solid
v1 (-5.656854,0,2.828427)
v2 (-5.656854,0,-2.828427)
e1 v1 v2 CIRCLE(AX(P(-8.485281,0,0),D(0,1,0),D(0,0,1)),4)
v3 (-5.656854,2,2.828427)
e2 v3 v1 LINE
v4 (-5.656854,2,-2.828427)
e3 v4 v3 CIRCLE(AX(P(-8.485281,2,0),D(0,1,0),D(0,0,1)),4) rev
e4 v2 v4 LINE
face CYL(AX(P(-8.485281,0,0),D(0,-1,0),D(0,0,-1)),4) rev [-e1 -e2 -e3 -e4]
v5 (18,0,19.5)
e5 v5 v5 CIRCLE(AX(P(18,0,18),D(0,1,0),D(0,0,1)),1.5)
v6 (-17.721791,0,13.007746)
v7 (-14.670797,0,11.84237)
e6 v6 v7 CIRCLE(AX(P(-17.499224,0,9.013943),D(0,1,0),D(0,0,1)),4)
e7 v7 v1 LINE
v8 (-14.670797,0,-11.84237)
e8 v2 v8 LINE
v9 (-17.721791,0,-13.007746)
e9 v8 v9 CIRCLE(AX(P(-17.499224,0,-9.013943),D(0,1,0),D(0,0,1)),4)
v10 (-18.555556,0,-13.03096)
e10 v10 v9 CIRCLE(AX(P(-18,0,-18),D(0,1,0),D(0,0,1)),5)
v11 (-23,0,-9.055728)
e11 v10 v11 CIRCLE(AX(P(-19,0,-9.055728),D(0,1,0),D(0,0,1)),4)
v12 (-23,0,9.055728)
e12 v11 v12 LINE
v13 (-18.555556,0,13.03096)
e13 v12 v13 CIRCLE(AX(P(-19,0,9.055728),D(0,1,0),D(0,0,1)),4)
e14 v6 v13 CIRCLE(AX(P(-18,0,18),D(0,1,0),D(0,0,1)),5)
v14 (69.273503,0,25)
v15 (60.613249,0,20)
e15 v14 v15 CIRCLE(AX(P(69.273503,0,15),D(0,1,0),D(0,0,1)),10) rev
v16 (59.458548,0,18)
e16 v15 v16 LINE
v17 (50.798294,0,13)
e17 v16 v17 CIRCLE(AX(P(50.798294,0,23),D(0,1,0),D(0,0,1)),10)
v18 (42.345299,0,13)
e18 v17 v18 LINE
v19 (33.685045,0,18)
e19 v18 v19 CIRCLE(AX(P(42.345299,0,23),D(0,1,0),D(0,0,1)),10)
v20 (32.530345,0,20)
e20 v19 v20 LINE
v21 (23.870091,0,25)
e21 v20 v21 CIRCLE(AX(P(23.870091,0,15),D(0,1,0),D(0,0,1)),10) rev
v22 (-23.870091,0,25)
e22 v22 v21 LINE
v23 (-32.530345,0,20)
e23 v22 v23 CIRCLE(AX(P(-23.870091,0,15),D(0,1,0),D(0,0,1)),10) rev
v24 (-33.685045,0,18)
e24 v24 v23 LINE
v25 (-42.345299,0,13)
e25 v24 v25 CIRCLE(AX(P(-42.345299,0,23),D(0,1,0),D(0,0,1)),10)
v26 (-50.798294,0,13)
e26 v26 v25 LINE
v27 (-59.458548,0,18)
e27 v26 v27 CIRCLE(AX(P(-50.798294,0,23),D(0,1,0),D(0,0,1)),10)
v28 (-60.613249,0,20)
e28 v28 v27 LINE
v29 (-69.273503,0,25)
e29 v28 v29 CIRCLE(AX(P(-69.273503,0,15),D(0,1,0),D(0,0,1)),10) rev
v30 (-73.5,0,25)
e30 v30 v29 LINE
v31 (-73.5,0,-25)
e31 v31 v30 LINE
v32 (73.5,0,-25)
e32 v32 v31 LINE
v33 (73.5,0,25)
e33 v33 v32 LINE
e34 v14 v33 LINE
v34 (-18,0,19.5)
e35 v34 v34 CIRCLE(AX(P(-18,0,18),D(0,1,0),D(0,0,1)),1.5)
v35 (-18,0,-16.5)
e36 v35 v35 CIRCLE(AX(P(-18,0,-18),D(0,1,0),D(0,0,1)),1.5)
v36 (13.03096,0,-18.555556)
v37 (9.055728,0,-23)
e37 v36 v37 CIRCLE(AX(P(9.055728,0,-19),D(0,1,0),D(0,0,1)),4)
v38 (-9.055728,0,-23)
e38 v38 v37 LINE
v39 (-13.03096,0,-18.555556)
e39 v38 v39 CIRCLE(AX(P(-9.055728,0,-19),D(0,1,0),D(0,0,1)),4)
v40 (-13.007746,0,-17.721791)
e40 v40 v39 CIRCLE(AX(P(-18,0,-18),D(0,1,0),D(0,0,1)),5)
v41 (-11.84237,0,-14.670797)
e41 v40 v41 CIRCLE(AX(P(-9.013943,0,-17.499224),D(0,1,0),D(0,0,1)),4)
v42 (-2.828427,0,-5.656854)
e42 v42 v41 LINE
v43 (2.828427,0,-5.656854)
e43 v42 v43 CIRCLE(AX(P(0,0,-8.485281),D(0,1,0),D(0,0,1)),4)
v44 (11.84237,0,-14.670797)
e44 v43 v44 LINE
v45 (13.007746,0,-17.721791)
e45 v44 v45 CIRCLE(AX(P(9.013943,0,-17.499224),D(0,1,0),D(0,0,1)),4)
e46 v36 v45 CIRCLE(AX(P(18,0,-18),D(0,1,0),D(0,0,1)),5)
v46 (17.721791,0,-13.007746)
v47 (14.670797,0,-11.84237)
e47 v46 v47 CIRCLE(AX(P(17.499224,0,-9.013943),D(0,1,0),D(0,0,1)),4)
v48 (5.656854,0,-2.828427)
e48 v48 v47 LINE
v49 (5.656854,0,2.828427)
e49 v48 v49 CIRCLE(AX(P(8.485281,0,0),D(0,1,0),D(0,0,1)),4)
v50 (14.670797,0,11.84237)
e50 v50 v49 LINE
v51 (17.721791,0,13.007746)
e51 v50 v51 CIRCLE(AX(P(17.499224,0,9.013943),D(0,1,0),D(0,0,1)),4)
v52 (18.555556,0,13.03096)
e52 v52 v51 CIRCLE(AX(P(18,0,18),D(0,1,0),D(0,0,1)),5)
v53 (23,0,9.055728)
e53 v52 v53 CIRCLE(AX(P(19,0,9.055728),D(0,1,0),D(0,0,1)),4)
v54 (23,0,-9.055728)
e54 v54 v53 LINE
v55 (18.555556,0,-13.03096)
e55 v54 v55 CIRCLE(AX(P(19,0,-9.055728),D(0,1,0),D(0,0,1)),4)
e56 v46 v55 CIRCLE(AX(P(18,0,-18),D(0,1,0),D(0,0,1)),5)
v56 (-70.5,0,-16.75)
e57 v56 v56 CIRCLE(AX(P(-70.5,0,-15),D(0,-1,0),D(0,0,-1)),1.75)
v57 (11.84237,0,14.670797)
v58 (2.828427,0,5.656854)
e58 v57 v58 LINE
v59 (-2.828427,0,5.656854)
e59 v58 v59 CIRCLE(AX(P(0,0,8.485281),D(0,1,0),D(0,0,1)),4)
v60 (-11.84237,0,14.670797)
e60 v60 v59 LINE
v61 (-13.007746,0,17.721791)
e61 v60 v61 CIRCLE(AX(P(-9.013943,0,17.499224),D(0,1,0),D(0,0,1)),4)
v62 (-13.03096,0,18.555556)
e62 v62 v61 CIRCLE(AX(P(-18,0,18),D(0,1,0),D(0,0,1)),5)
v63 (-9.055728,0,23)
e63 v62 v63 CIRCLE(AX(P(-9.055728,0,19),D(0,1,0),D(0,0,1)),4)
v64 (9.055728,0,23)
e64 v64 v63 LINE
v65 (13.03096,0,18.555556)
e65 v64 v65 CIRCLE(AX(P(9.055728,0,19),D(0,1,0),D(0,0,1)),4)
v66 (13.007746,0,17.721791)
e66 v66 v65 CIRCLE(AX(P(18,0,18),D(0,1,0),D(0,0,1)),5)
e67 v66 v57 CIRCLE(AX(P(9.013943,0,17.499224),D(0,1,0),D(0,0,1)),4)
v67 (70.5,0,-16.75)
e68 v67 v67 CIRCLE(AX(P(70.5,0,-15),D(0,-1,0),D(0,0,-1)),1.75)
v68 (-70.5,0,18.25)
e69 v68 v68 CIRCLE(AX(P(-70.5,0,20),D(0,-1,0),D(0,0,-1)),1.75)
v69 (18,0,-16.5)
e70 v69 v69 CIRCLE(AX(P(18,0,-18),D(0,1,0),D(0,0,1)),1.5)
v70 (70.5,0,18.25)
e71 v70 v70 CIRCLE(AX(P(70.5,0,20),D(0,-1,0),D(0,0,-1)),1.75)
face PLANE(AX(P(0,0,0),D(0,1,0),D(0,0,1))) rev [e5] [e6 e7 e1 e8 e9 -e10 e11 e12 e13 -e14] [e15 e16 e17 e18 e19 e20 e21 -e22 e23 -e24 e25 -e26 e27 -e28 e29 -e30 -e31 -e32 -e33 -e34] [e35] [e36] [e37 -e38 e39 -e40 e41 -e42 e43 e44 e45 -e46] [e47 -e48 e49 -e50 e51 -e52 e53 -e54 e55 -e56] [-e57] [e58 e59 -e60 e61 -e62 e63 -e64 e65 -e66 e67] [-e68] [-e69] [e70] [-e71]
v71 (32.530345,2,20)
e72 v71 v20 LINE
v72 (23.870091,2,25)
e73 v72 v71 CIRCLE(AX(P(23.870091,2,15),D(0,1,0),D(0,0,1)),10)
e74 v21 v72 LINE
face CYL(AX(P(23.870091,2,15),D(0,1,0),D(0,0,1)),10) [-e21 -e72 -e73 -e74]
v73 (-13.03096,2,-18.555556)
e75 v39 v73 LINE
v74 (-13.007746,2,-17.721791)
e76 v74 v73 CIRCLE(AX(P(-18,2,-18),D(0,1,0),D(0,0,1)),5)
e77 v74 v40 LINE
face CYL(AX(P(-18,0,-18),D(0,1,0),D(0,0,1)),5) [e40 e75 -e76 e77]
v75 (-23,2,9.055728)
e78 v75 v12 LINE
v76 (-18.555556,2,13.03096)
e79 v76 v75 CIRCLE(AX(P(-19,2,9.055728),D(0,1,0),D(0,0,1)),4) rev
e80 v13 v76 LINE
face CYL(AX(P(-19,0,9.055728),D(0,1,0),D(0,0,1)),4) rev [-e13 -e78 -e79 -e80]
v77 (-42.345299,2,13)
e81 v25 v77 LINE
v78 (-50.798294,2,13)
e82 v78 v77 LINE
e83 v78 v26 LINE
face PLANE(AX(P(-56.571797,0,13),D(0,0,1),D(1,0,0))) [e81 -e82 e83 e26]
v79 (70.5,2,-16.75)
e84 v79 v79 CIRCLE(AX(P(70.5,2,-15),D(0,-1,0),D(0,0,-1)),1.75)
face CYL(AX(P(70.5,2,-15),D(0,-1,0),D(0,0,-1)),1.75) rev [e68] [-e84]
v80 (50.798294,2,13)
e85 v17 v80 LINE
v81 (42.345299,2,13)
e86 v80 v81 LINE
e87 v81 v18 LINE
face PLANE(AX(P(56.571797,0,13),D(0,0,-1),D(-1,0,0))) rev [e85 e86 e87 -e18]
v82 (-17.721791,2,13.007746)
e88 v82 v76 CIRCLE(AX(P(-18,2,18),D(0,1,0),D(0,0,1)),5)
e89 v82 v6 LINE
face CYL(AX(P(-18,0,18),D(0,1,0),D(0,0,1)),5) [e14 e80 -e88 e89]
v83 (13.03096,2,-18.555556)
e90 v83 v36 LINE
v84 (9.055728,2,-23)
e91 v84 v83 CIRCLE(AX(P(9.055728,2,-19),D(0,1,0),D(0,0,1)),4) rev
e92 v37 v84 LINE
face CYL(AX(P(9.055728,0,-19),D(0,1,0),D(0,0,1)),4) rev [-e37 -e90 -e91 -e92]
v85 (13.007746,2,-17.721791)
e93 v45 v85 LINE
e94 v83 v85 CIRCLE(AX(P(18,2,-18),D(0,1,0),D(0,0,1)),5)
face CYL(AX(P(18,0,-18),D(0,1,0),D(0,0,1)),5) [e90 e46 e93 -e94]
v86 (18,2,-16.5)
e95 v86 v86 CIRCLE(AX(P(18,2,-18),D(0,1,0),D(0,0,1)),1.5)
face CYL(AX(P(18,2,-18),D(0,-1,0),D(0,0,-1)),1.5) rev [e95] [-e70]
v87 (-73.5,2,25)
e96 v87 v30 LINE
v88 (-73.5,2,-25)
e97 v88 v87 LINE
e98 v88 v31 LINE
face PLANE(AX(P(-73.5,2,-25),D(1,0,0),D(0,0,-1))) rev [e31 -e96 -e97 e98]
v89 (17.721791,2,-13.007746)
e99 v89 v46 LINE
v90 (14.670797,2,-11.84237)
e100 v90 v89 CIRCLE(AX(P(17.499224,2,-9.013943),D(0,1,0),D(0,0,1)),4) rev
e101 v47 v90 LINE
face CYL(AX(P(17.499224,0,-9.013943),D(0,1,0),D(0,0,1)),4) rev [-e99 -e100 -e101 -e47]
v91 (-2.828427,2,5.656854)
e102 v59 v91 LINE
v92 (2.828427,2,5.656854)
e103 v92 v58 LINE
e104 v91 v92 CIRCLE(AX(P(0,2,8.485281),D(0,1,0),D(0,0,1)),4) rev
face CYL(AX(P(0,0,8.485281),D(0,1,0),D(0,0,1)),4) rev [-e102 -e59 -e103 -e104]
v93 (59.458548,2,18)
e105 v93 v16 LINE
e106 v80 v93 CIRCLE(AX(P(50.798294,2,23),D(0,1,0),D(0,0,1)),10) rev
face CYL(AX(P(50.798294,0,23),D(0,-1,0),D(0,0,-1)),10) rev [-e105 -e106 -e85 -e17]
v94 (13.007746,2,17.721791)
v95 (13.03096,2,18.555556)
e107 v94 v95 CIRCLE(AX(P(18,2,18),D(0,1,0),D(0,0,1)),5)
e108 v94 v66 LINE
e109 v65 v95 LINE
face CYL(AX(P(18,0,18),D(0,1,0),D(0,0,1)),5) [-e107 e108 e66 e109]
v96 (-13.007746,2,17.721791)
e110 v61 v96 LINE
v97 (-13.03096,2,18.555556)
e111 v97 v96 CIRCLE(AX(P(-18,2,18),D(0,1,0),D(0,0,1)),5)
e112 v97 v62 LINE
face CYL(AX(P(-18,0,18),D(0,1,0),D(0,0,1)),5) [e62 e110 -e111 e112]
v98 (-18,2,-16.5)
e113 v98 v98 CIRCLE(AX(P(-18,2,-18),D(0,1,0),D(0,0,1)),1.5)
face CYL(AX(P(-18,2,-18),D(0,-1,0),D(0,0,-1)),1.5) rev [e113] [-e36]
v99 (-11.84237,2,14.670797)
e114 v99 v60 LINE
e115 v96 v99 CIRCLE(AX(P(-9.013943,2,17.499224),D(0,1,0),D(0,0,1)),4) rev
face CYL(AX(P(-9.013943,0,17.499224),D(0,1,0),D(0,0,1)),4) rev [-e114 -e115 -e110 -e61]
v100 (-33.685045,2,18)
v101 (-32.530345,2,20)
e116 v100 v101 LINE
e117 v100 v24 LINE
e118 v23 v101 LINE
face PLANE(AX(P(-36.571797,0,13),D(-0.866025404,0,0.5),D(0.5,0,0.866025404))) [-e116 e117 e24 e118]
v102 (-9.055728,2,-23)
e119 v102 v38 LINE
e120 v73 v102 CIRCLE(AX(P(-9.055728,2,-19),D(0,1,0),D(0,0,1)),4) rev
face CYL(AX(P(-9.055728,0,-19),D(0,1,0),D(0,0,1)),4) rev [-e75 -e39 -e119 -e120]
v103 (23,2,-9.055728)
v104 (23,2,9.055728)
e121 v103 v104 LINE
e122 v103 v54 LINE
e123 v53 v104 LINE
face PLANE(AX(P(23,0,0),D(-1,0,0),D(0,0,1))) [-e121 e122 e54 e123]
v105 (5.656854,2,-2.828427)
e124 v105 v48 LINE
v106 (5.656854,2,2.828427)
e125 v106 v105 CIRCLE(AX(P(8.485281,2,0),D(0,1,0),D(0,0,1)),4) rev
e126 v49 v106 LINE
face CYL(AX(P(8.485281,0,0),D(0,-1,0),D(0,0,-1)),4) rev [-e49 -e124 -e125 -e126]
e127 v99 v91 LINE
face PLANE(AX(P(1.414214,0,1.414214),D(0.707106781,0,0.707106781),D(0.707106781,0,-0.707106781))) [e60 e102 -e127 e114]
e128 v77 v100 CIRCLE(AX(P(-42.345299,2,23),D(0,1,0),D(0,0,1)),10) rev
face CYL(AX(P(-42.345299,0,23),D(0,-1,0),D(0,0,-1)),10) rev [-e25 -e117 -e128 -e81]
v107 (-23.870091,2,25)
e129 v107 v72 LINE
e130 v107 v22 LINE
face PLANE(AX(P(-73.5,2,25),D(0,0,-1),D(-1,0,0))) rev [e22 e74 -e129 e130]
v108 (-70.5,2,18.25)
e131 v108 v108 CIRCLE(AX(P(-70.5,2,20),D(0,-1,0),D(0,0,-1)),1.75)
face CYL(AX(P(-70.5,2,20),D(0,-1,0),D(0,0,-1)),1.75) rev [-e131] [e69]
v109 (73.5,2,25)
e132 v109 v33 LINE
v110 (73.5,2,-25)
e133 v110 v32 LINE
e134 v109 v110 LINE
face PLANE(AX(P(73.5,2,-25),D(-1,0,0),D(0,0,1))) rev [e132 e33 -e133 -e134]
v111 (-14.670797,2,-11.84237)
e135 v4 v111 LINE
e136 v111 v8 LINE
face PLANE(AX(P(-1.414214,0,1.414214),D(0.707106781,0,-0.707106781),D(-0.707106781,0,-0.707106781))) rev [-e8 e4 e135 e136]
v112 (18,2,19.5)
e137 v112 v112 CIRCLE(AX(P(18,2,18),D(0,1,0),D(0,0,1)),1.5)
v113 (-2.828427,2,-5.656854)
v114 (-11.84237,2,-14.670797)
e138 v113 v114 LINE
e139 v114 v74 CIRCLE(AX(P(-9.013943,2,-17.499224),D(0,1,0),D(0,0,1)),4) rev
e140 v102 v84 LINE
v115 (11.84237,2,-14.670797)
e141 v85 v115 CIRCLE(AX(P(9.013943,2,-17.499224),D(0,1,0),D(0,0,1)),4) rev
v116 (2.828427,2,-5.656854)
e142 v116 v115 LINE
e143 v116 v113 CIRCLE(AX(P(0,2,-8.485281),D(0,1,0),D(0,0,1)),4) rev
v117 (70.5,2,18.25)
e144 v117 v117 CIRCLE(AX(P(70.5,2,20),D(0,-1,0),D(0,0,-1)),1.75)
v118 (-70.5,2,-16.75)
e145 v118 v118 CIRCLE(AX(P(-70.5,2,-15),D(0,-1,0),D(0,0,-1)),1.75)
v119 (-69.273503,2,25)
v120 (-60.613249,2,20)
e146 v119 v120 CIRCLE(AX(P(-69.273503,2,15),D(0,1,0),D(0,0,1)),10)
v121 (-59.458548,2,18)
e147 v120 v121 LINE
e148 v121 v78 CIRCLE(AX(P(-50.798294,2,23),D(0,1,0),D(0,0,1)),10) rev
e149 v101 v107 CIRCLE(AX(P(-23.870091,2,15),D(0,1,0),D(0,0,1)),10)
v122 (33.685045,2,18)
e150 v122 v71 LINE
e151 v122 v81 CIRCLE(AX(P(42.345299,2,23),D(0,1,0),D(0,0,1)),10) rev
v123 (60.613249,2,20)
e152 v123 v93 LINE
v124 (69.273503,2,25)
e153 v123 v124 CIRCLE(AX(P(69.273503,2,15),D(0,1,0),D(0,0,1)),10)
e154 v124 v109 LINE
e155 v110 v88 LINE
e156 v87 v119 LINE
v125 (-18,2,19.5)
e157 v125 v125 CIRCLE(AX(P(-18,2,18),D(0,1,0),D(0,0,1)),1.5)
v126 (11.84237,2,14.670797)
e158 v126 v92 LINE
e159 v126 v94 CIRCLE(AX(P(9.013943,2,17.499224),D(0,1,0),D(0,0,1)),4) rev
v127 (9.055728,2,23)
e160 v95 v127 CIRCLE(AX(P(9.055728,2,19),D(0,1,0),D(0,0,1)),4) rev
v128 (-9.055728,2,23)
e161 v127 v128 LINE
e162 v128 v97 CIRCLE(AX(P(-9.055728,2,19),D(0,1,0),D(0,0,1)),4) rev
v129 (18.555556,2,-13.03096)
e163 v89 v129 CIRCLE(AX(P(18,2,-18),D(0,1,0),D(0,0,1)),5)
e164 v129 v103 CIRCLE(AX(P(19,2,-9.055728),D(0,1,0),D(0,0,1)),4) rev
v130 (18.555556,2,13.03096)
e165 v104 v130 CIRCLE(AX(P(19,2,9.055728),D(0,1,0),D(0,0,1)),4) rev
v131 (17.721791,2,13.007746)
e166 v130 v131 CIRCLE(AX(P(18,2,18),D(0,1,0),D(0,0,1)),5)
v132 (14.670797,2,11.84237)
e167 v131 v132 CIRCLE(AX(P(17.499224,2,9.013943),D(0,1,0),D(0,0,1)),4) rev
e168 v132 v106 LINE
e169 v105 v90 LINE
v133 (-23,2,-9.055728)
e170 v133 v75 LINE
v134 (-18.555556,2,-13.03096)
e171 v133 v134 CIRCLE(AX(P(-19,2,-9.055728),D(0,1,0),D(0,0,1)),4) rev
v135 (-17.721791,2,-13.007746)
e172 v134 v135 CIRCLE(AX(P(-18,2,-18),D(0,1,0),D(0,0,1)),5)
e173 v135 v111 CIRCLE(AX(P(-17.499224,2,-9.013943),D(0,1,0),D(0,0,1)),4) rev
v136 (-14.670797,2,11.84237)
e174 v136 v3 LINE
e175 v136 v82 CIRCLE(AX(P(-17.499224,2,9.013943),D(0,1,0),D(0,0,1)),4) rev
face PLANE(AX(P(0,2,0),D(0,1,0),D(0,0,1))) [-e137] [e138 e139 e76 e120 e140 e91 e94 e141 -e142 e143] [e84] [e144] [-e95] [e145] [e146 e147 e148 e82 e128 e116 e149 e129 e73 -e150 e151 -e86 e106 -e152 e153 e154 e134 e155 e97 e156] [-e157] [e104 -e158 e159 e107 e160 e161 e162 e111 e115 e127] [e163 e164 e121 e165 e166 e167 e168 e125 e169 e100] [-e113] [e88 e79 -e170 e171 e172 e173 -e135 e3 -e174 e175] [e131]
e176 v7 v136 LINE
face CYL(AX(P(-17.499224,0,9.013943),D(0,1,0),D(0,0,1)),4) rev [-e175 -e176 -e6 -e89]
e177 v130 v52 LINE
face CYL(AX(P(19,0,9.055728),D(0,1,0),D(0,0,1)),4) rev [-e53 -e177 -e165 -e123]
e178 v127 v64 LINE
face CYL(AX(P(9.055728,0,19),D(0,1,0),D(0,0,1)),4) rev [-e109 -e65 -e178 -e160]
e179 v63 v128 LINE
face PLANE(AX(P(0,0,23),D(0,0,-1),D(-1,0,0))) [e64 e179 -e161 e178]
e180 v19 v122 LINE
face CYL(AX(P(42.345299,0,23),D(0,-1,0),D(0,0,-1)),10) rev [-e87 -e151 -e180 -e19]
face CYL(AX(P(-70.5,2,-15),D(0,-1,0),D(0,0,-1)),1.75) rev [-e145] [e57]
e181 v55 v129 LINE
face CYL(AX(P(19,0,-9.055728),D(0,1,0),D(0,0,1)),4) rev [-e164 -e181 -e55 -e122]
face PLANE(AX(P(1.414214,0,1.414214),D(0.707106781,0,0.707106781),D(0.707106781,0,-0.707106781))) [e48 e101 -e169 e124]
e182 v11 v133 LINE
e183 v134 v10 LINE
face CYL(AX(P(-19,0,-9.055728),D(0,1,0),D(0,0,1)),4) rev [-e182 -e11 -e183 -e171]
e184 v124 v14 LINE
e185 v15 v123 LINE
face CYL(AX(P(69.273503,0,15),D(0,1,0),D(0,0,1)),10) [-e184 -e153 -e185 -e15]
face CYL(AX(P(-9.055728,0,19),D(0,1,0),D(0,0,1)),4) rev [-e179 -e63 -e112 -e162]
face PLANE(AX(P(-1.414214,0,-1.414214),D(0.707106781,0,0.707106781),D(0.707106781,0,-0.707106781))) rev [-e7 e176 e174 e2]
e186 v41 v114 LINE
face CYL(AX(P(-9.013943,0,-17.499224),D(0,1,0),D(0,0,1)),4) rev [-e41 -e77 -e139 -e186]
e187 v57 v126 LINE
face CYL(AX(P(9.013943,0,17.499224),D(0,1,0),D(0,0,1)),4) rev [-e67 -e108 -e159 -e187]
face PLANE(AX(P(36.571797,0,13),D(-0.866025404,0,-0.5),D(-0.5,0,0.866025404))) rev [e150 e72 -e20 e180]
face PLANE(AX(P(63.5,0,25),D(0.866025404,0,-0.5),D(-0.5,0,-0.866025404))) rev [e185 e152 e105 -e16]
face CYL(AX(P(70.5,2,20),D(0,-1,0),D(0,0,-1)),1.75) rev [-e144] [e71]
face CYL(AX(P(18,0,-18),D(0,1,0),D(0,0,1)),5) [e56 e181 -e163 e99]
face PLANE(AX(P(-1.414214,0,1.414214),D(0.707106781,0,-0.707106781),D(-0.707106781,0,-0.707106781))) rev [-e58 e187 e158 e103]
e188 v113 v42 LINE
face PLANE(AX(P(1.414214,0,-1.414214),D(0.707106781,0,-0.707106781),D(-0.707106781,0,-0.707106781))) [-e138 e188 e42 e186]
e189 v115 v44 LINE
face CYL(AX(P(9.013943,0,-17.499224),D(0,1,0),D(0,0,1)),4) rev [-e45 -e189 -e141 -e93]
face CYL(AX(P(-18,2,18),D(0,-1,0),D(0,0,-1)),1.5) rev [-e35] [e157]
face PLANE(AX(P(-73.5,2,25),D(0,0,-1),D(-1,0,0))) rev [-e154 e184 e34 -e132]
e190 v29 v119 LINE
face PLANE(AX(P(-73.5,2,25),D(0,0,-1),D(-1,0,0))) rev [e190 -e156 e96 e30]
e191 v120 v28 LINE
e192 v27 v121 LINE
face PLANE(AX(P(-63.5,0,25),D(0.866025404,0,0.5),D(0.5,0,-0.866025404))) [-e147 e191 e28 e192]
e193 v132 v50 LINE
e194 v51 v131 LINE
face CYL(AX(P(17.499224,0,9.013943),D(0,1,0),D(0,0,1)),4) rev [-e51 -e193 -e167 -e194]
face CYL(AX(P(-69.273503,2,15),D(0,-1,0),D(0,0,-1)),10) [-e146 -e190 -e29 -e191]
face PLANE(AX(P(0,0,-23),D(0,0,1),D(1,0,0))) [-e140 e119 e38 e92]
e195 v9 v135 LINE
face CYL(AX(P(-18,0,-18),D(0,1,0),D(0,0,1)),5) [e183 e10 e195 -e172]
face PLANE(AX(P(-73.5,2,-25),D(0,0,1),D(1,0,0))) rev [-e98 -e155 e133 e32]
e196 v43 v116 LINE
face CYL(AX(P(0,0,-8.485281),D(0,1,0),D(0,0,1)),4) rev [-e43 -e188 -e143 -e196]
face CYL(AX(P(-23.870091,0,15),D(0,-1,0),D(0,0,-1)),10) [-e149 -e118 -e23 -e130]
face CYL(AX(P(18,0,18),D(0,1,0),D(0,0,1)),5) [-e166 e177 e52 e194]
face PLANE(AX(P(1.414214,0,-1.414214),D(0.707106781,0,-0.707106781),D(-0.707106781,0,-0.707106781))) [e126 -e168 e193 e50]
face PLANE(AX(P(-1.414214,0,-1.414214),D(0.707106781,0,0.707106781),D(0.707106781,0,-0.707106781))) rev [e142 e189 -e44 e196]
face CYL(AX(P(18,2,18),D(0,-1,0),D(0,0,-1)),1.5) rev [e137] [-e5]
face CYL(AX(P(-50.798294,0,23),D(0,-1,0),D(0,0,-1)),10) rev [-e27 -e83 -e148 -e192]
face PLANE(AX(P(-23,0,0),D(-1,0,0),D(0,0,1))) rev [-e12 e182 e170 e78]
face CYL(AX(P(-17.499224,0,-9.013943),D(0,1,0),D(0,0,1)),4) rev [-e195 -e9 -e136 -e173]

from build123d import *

# Parameters (mm, degrees)
SKETCH_1_W          = 147
SKETCH_1_H          = 50
SKETCH_1_R          = 1.5
EXTRUDE_1_DEPTH     = 2
CUT_EXTRUDE_1_DEPTH = 2
FILLET_2_DEPTH      = 2
FILLET_3_R          = 4
CUT_EXTRUDE_3_DEPTH = 78.661122835
SKETCH_7_R          = 1.75
CUT_EXTRUDE_4_DEPTH = 78.661122835
FILLET_4_R          = 10


with BuildPart() as part:
    # 草图1 → 凸台-拉伸1 (new body)
    with BuildSketch(Plane(origin=(0, 0, 0), x_dir=(1, 0, 0), z_dir=(0, 1, 0))):
        Rectangle(SKETCH_1_W, SKETCH_1_H)
        with Locations(Location((18, -18, 0), (0, 0, 270))):
            Circle(SKETCH_1_R, mode=Mode.SUBTRACT)
        with Locations(Location((-18, -18, 0), (0, 0, 270))):
            Circle(SKETCH_1_R, mode=Mode.SUBTRACT)
        with Locations(Location((-18, 18, 0), (0, 0, 270))):
            Circle(SKETCH_1_R, mode=Mode.SUBTRACT)
        with Locations(Location((18, 18, 0), (0, 0, 270))):
            Circle(SKETCH_1_R, mode=Mode.SUBTRACT)
    extrude(amount=EXTRUDE_1_DEPTH)

    # 草图3 → 切除-拉伸1 (cut)
    with BuildSketch(Plane(origin=(0, 2, 0), x_dir=(1, 0, 0), z_dir=(0, 1, 0))):
        with BuildLine():
            Line((-13.345416088, 16.173843213), (0, 2.828427125))
            Line((0, 2.828427125), (13.345416088, 16.173843213))
            ThreePointArc((13.345416088, 16.173843213), (13.868972045, 20.816843629), (18, 23))
            Line((18, 23), (-18, 23))
            ThreePointArc((-18, 23), (-14.464466094, 21.535533906), (-13, 18))
            ThreePointArc((-13, 18), (-13.087112888, 17.070731352), (-13.345416088, 16.173843213))
        make_face()
        with BuildLine():
            Line((16.173843213, 13.345416088), (2.828427125, 0))
            Line((2.828427125, 0), (16.173843213, -13.345416088))
            ThreePointArc((16.173843213, -13.345416088), (20.816843629, -13.868972045), (23, -18))
            Line((23, -18), (23, 18))
            ThreePointArc((23, 18), (20.816843629, 13.868972045), (16.173843213, 13.345416088))
        make_face()
        with BuildLine():
            Line((0, -2.828427125), (-13.345416088, -16.173843213))
            ThreePointArc((-13.345416088, -16.173843213), (-13.087112888, -17.070731352), (-13, -18))
            ThreePointArc((-13, -18), (-14.464466094, -21.535533906), (-18, -23))
            Line((-18, -23), (18, -23))
            ThreePointArc((18, -23), (13.868972045, -20.816843629), (13.345416088, -16.173843213))
            Line((13.345416088, -16.173843213), (0, -2.828427125))
        make_face()
        with BuildLine():
            ThreePointArc((-23, -18), (-20.816843629, -13.868972045), (-16.173843213, -13.345416088))
            Line((-16.173843213, -13.345416088), (-2.828427125, 0))
            Line((-2.828427125, 0), (-16.173843213, 13.345416088))
            ThreePointArc((-16.173843213, 13.345416088), (-20.816843629, 13.868972045), (-23, 18))
            Line((-23, 18), (-23, -18))
        make_face()
    extrude(amount=-CUT_EXTRUDE_1_DEPTH, mode=Mode.SUBTRACT)

    # 圆角2: read off the stored shape, not the designer's step
    # 圆角2 outline → 圆角2 (add)
    with BuildSketch(Plane(origin=(0, 0, 0), x_dir=(1, 0, 0), z_dir=(0, 1, 0))):
        with BuildLine():
            Line((-23, 18), (-23, 9.05572809))
            ThreePointArc((-23, 9.05572809), (-21.666666667, 12.03715206), (-18.555555556, 13.03096005))
            ThreePointArc((-18.555555556, 13.03096005), (-21.726779962, 14.666666667), (-23, 18))
        make_face()
        with BuildLine():
            ThreePointArc((-18.555555556, -13.03096005), (-21.666666667, -12.03715206), (-23, -9.05572809))
            Line((-23, -9.05572809), (-23, -18))
            ThreePointArc((-23, -18), (-21.726779962, -14.666666667), (-18.555555556, -13.03096005))
        make_face()
        with BuildLine():
            ThreePointArc((13.03096005, -18.555555556), (12.03715206, -21.666666667), (9.05572809, -23))
            Line((9.05572809, -23), (18, -23))
            ThreePointArc((18, -23), (14.666666667, -21.726779962), (13.03096005, -18.555555556))
        make_face()
        with BuildLine():
            ThreePointArc((-9.05572809, -23), (-12.03715206, -21.666666667), (-13.03096005, -18.555555556))
            ThreePointArc((-13.03096005, -18.555555556), (-14.666666667, -21.726779962), (-18, -23))
            Line((-18, -23), (-9.05572809, -23))
        make_face()
        with BuildLine():
            ThreePointArc((18.555555556, 13.03096005), (21.666666667, 12.03715206), (23, 9.05572809))
            Line((23, 9.05572809), (23, 18))
            ThreePointArc((23, 18), (21.726779962, 14.666666667), (18.555555556, 13.03096005))
        make_face()
        with BuildLine():
            ThreePointArc((23, -9.05572809), (21.666666667, -12.03715206), (18.555555556, -13.03096005))
            ThreePointArc((18.555555556, -13.03096005), (21.726779962, -14.666666667), (23, -18))
            Line((23, -18), (23, -9.05572809))
        make_face()
        with BuildLine():
            ThreePointArc((-13.03096005, 18.555555556), (-12.03715206, 21.666666667), (-9.05572809, 23))
            Line((-9.05572809, 23), (-18, 23))
            ThreePointArc((-18, 23), (-14.666666667, 21.726779962), (-13.03096005, 18.555555556))
        make_face()
        with BuildLine():
            ThreePointArc((9.05572809, 23), (12.03715206, 21.666666667), (13.03096005, 18.555555556))
            ThreePointArc((13.03096005, 18.555555556), (14.666666667, 21.726779962), (18, 23))
            Line((18, 23), (9.05572809, 23))
        make_face()
    extrude(amount=FILLET_2_DEPTH)

    # 圆角3
    fillet_3_edges = [part.edges().sort_by_distance(p)[0] for p in [
        (13.345416088, 1, 16.173843213),
        (-13.345416088, 1, 16.173843213),
        (0, 1, 2.828427125),
        (16.173843213, 1, -13.345416088),
        (16.173843213, 1, 13.345416088),
        (2.828427125, 1, 0),
        (-16.173843213, 1, -13.345416088),
        (-2.828427125, 1, 0),
        (-16.173843213, 1, 13.345416088),
        (-13.345416088, 1, -16.173843213),
        (13.345416088, 1, -16.173843213),
        (0, 1, -2.828427125),
    ]]
    fillet(fillet_3_edges, radius=FILLET_3_R)

    # 草图6 → 切除-拉伸3 (cut, through all)
    with BuildSketch(Plane(origin=(0, 2, 0), x_dir=(1, 0, 0), z_dir=(0, 1, 0))):
        Polygon((63.5, -25), (56.57179677, -13), (36.57179677, -13), (29.643593539, -25), align=None)
    cut_extrude_3 = extrude(amount=-CUT_EXTRUDE_3_DEPTH, mode=Mode.SUBTRACT)

    # 镜向1: 切除-拉伸3 across plane
    add(cut_extrude_3.mirror(Plane(origin=(0, 0, 0), x_dir=(0, 0, 1), z_dir=(1, 0, 0))), mode=Mode.SUBTRACT)

    # 草图7 → 切除-拉伸4 (cut, through all)
    with BuildSketch(Plane.XZ):
        with Locations(Location((70.5, 20, 0), (0, 0, 270))):
            Circle(SKETCH_7_R)
        with Locations(Location((70.5, -15, 0), (0, 0, 270))):
            Circle(SKETCH_7_R)
        with Locations(Location((-70.5, -15, 0), (0, 0, 270))):
            Circle(SKETCH_7_R)
        with Locations(Location((-70.5, 20, 0), (0, 0, 270))):
            Circle(SKETCH_7_R)
    extrude(amount=-CUT_EXTRUDE_4_DEPTH, mode=Mode.SUBTRACT)

    # 圆角4
    fillet_4_edges = [part.edges().sort_by_distance(p)[0] for p in [
        (63.5, 1, 25),
        (29.643593539, 1, 25),
        (36.57179677, 1, 13),
        (56.57179677, 1, 13),
        (-29.643593539, 1, 25),
        (-63.5, 1, 25),
        (-56.57179677, 1, 13),
        (-36.57179677, 1, 13),
    ]]
    fillet(fillet_4_edges, radius=FILLET_4_R)


solid = part.part
